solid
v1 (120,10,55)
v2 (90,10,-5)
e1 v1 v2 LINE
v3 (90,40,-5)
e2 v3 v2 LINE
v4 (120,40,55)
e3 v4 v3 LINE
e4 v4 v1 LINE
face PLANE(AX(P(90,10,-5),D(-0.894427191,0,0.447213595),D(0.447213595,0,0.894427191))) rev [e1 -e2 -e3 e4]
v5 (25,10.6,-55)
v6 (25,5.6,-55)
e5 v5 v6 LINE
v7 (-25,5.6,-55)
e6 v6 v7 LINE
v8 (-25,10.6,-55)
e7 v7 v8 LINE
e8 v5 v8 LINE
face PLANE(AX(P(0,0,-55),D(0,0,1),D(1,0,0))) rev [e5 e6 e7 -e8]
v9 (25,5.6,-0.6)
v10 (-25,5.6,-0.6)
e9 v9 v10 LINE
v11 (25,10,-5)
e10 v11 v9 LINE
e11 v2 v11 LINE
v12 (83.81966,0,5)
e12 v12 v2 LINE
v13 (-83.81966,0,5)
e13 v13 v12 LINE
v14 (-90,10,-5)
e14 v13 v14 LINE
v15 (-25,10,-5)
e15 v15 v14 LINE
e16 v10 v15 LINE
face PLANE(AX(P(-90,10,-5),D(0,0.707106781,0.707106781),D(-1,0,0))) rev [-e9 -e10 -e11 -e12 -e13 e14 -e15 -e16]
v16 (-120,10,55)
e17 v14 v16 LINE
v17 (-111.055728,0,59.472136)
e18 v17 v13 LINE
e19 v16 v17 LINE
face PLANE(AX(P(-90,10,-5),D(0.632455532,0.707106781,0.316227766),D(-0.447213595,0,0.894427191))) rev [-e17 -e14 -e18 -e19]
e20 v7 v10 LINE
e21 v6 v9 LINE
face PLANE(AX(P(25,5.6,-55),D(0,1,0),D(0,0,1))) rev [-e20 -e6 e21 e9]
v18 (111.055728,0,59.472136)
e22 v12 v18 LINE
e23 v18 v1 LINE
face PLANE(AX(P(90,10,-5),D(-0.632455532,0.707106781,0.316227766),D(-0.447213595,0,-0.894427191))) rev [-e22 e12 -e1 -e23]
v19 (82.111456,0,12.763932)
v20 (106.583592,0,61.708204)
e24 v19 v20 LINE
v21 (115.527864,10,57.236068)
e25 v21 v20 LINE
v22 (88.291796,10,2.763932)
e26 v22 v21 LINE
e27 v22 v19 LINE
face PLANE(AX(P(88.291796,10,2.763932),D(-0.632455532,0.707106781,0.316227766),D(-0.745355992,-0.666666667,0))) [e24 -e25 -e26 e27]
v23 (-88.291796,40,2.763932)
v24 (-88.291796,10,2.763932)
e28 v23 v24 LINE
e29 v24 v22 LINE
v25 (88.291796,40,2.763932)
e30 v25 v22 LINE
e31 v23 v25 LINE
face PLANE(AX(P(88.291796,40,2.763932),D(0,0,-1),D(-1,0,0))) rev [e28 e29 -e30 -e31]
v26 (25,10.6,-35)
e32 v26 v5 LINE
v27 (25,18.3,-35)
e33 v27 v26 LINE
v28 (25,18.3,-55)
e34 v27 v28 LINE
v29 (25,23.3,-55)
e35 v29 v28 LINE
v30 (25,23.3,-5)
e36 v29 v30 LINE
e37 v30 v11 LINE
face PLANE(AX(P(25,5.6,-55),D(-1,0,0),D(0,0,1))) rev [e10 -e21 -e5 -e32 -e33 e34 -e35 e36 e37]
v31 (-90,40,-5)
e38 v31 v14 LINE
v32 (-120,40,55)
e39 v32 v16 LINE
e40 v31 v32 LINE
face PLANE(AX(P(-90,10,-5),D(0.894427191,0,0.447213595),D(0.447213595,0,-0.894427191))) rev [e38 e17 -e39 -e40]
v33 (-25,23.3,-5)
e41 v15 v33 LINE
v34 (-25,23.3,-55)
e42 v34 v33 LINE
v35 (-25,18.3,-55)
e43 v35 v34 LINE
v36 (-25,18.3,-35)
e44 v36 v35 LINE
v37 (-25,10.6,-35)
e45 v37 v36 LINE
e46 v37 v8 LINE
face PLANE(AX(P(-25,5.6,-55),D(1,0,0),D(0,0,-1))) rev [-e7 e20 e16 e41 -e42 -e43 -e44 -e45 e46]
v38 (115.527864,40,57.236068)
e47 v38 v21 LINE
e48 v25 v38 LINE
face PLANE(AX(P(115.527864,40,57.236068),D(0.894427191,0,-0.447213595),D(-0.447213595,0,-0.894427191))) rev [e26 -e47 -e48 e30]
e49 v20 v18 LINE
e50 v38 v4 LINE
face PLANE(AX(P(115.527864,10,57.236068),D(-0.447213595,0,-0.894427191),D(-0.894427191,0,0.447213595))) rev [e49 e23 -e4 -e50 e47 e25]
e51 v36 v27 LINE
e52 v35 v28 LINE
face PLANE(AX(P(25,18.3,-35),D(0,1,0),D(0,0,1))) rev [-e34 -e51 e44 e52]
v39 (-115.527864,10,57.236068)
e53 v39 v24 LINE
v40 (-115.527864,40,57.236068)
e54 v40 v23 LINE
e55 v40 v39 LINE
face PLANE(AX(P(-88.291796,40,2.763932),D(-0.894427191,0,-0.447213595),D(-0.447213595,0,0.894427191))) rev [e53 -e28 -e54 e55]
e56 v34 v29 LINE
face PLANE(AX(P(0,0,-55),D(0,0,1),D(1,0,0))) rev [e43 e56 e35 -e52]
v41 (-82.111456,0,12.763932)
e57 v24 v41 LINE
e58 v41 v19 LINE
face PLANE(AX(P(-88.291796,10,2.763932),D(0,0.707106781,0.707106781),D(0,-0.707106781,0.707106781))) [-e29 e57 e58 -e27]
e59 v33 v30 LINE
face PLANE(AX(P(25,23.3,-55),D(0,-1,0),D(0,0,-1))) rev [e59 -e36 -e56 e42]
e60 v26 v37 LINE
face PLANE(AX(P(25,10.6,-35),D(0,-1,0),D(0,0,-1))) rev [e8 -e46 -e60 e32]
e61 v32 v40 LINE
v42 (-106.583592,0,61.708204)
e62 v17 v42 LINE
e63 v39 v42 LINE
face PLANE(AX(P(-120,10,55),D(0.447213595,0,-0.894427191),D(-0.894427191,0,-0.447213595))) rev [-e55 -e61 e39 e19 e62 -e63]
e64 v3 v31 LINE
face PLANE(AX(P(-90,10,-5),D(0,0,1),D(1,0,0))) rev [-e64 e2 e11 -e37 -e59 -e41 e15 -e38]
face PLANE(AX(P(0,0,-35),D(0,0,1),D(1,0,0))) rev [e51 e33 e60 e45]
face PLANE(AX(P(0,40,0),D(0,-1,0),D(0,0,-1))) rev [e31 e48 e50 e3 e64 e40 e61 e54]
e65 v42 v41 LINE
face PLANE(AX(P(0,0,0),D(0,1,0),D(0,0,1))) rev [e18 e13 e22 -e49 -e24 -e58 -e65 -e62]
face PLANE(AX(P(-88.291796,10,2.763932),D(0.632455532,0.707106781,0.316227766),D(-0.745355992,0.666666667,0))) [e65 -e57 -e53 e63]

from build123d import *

# Parameters (mm, degrees)
BOSS_EXTRUDE1_DEPTH = 10
DRAFT1_ANGLE        = 45
BOSS_EXTRUDE2_DEPTH = 30
SKETCH6_W           = 50
SKETCH6_H           = 17.7
BOSS_EXTRUDE3_DEPTH = 50
SKETCH7_W           = 50
SKETCH7_H           = 7.7
CUT_EXTRUDE4_DEPTH  = 20
CHAMFER1_SIZE       = 10


with BuildPart() as part:
    # Sketch2 → Boss-Extrude1 (new body)
    with BuildSketch(Plane(origin=(0, 0, 0), x_dir=(1, 0, 0), z_dir=(0, 1, 0))):
        Polygon((-90, 5), (90, 5), (120, -55), (115.527864045, -57.236067977), (88.291796068, -2.763932023), (-88.291796068, -2.763932023), (-115.527864045, -57.236067977), (-120, -55), align=None)
    extrude(amount=BOSS_EXTRUDE1_DEPTH)

    # Draft1
    draft1_faces = [part.faces().sort_by_distance(p)[0] for p in [
        (101.909830056, 5, 30),
        (0, 5, 2.763932023),
        (-101.909830056, 5, 30),
    ]]
    draft(draft1_faces, Plane.ZX.offset(10), DRAFT1_ANGLE)

    # Sketch5 → Boss-Extrude2 (add)
    with BuildSketch(Plane(origin=(0, 10, 0), x_dir=(1, 0, 0), z_dir=(0, 1, 0))):
        Polygon((-120, -55), (-90, 5), (90, 5), (120, -55), (115.527864045, -57.236067977), (88.291796068, -2.763932023), (-88.291796068, -2.763932023), (-115.527864045, -57.236067977), align=None)
    extrude(amount=BOSS_EXTRUDE2_DEPTH)

    # Sketch6 → Boss-Extrude3 (add)
    with BuildSketch(Plane(origin=(0, 0, -5), x_dir=(-1, 0, 0), z_dir=(0, 0, -1))):
        with Locations((0, 14.45)):
            Rectangle(SKETCH6_W, SKETCH6_H)
    extrude(amount=BOSS_EXTRUDE3_DEPTH)

    # Sketch7 → Cut-Extrude4 (cut)
    with BuildSketch(Plane(origin=(0, 0, -55), x_dir=(-1, 0, 0), z_dir=(0, 0, -1))):
        with Locations((0, 14.45)):
            Rectangle(SKETCH7_W, SKETCH7_H)
    extrude(amount=-CUT_EXTRUDE4_DEPTH, mode=Mode.SUBTRACT)

    # Chamfer1
    # the kernel refuses this chamfer: 10 mm, written as the material it takes off along each edge
    with BuildSketch(Plane(origin=(78.499084045, 0, -28.001831911), x_dir=(-0.8940890232049223, -0.027495876610586386, 0.44704451160246145), z_dir=(0.44721359549995815, 0, 0.8944271909999159))) as chamfer1_piece_1:
        Polygon((CHAMFER1_SIZE * 0.999621916911, -CHAMFER1_SIZE * 0.0274958766106), (-CHAMFER1_SIZE * 0.0274958766106, -CHAMFER1_SIZE * 0.999621916911), (0, 0), align=None)
    extrude(amount=118.515699084, mode=Mode.SUBTRACT)
    with BuildSketch(Plane(origin=(-115.71682988, 0, -5), x_dir=(0, 0.9996219169112968, -0.027495876610586403), z_dir=(1, 0, 0))) as chamfer1_piece_2_section:
        Polygon((CHAMFER1_SIZE * 0.999621916911, CHAMFER1_SIZE * 0.0274958766106), (-CHAMFER1_SIZE * 0.0274958766106, CHAMFER1_SIZE * 0.999621916911), (0, 0), align=None)
    chamfer1_piece_2 = extrude(amount=231.433659759, mode=Mode.PRIVATE)
    chamfer1_piece_2 = split(chamfer1_piece_2, bisect_by=Plane(origin=(-70.35841494, 5.6, -3.753576162), z_dir=(0, 1, 0)), keep=Keep.TOP, mode=Mode.PRIVATE)
    chamfer1_piece_2 = split(chamfer1_piece_2, bisect_by=Plane(origin=(-25, 7.219915687, -3.753576162), z_dir=(-1, 0, 0)), keep=Keep.TOP, mode=Mode.PRIVATE)
    add(chamfer1_piece_2, mode=Mode.SUBTRACT)
    with BuildSketch(Plane(origin=(-115.71682988, 0, -5), x_dir=(0, 0.9996219169112968, -0.027495876610586403), z_dir=(1, 0, 0))) as chamfer1_piece_3_section:
        Polygon((CHAMFER1_SIZE * 0.999621916911, CHAMFER1_SIZE * 0.0274958766106), (-CHAMFER1_SIZE * 0.0274958766106, CHAMFER1_SIZE * 0.999621916911), (0, 0), align=None)
    chamfer1_piece_3 = extrude(amount=231.433659759, mode=Mode.PRIVATE)
    chamfer1_piece_3 = split(chamfer1_piece_3, bisect_by=Plane(origin=(-70.35841494, 5.6, -1.178972158), z_dir=(0, -1, 0)), keep=Keep.TOP, mode=Mode.PRIVATE)
    chamfer1_piece_3 = split(chamfer1_piece_3, bisect_by=Plane(origin=(-25, 2.297915816, -1.178972158), z_dir=(-1, 0, 0)), keep=Keep.TOP, mode=Mode.PRIVATE)
    add(chamfer1_piece_3, mode=Mode.SUBTRACT)
    with BuildSketch(Plane(origin=(-115.71682988, 0, -5), x_dir=(0, 0.9996219169112968, -0.027495876610586403), z_dir=(1, 0, 0))) as chamfer1_piece_4_section:
        Polygon((CHAMFER1_SIZE * 0.999621916911, CHAMFER1_SIZE * 0.0274958766106), (-CHAMFER1_SIZE * 0.0274958766106, CHAMFER1_SIZE * 0.999621916911), (0, 0), align=None)
    chamfer1_piece_4 = extrude(amount=231.433659759, mode=Mode.PRIVATE)
    chamfer1_piece_4 = split(chamfer1_piece_4, bisect_by=Plane(origin=(0, 5.6, -1.178972158), z_dir=(0, -1, 0)), keep=Keep.TOP, mode=Mode.PRIVATE)
    chamfer1_piece_4 = split(chamfer1_piece_4, bisect_by=Plane(origin=(-25, 2.297915816, -1.178972158), z_dir=(1, 0, 0)), keep=Keep.TOP, mode=Mode.PRIVATE)
    chamfer1_piece_4 = split(chamfer1_piece_4, bisect_by=Plane(origin=(25, 2.297915816, -1.178972158), z_dir=(-1, 0, 0)), keep=Keep.TOP, mode=Mode.PRIVATE)
    add(chamfer1_piece_4, mode=Mode.SUBTRACT)
    with BuildSketch(Plane(origin=(-115.71682988, 0, -5), x_dir=(0, 0.9996219169112968, -0.027495876610586403), z_dir=(1, 0, 0))) as chamfer1_piece_5_section:
        Polygon((CHAMFER1_SIZE * 0.999621916911, CHAMFER1_SIZE * 0.0274958766106), (-CHAMFER1_SIZE * 0.0274958766106, CHAMFER1_SIZE * 0.999621916911), (0, 0), align=None)
    chamfer1_piece_5 = extrude(amount=231.433659759, mode=Mode.PRIVATE)
    chamfer1_piece_5 = split(chamfer1_piece_5, bisect_by=Plane(origin=(70.35841494, 5.6, -3.753576162), z_dir=(0, 1, 0)), keep=Keep.TOP, mode=Mode.PRIVATE)
    chamfer1_piece_5 = split(chamfer1_piece_5, bisect_by=Plane(origin=(25, 7.219915687, -3.753576162), z_dir=(1, 0, 0)), keep=Keep.TOP, mode=Mode.PRIVATE)
    add(chamfer1_piece_5, mode=Mode.SUBTRACT)
    with BuildSketch(Plane(origin=(-115.71682988, 0, -5), x_dir=(0, 0.9996219169112968, -0.027495876610586403), z_dir=(1, 0, 0))) as chamfer1_piece_6_section:
        Polygon((CHAMFER1_SIZE * 0.999621916911, CHAMFER1_SIZE * 0.0274958766106), (-CHAMFER1_SIZE * 0.0274958766106, CHAMFER1_SIZE * 0.999621916911), (0, 0), align=None)
    chamfer1_piece_6 = extrude(amount=231.433659759, mode=Mode.PRIVATE)
    chamfer1_piece_6 = split(chamfer1_piece_6, bisect_by=Plane(origin=(70.35841494, 5.6, -1.178972158), z_dir=(0, -1, 0)), keep=Keep.TOP, mode=Mode.PRIVATE)
    chamfer1_piece_6 = split(chamfer1_piece_6, bisect_by=Plane(origin=(25, 2.297915816, -1.178972158), z_dir=(1, 0, 0)), keep=Keep.TOP, mode=Mode.PRIVATE)
    add(chamfer1_piece_6, mode=Mode.SUBTRACT)
    with BuildSketch(Plane(origin=(-131.500915955, 0, 78.001831911), x_dir=(-0.02459305968088589, 0.9996219169112968, -0.012296529840442941), z_dir=(0.447213595499958, 0, -0.894427190999916))) as chamfer1_piece_7:
        Polygon((CHAMFER1_SIZE * 0.999621916911, CHAMFER1_SIZE * 0.0274958766106), (-CHAMFER1_SIZE * 0.0274958766106, CHAMFER1_SIZE * 0.999621916911), (0, 0), align=None)
    extrude(amount=118.515699084, mode=Mode.SUBTRACT)


solid = part.part
